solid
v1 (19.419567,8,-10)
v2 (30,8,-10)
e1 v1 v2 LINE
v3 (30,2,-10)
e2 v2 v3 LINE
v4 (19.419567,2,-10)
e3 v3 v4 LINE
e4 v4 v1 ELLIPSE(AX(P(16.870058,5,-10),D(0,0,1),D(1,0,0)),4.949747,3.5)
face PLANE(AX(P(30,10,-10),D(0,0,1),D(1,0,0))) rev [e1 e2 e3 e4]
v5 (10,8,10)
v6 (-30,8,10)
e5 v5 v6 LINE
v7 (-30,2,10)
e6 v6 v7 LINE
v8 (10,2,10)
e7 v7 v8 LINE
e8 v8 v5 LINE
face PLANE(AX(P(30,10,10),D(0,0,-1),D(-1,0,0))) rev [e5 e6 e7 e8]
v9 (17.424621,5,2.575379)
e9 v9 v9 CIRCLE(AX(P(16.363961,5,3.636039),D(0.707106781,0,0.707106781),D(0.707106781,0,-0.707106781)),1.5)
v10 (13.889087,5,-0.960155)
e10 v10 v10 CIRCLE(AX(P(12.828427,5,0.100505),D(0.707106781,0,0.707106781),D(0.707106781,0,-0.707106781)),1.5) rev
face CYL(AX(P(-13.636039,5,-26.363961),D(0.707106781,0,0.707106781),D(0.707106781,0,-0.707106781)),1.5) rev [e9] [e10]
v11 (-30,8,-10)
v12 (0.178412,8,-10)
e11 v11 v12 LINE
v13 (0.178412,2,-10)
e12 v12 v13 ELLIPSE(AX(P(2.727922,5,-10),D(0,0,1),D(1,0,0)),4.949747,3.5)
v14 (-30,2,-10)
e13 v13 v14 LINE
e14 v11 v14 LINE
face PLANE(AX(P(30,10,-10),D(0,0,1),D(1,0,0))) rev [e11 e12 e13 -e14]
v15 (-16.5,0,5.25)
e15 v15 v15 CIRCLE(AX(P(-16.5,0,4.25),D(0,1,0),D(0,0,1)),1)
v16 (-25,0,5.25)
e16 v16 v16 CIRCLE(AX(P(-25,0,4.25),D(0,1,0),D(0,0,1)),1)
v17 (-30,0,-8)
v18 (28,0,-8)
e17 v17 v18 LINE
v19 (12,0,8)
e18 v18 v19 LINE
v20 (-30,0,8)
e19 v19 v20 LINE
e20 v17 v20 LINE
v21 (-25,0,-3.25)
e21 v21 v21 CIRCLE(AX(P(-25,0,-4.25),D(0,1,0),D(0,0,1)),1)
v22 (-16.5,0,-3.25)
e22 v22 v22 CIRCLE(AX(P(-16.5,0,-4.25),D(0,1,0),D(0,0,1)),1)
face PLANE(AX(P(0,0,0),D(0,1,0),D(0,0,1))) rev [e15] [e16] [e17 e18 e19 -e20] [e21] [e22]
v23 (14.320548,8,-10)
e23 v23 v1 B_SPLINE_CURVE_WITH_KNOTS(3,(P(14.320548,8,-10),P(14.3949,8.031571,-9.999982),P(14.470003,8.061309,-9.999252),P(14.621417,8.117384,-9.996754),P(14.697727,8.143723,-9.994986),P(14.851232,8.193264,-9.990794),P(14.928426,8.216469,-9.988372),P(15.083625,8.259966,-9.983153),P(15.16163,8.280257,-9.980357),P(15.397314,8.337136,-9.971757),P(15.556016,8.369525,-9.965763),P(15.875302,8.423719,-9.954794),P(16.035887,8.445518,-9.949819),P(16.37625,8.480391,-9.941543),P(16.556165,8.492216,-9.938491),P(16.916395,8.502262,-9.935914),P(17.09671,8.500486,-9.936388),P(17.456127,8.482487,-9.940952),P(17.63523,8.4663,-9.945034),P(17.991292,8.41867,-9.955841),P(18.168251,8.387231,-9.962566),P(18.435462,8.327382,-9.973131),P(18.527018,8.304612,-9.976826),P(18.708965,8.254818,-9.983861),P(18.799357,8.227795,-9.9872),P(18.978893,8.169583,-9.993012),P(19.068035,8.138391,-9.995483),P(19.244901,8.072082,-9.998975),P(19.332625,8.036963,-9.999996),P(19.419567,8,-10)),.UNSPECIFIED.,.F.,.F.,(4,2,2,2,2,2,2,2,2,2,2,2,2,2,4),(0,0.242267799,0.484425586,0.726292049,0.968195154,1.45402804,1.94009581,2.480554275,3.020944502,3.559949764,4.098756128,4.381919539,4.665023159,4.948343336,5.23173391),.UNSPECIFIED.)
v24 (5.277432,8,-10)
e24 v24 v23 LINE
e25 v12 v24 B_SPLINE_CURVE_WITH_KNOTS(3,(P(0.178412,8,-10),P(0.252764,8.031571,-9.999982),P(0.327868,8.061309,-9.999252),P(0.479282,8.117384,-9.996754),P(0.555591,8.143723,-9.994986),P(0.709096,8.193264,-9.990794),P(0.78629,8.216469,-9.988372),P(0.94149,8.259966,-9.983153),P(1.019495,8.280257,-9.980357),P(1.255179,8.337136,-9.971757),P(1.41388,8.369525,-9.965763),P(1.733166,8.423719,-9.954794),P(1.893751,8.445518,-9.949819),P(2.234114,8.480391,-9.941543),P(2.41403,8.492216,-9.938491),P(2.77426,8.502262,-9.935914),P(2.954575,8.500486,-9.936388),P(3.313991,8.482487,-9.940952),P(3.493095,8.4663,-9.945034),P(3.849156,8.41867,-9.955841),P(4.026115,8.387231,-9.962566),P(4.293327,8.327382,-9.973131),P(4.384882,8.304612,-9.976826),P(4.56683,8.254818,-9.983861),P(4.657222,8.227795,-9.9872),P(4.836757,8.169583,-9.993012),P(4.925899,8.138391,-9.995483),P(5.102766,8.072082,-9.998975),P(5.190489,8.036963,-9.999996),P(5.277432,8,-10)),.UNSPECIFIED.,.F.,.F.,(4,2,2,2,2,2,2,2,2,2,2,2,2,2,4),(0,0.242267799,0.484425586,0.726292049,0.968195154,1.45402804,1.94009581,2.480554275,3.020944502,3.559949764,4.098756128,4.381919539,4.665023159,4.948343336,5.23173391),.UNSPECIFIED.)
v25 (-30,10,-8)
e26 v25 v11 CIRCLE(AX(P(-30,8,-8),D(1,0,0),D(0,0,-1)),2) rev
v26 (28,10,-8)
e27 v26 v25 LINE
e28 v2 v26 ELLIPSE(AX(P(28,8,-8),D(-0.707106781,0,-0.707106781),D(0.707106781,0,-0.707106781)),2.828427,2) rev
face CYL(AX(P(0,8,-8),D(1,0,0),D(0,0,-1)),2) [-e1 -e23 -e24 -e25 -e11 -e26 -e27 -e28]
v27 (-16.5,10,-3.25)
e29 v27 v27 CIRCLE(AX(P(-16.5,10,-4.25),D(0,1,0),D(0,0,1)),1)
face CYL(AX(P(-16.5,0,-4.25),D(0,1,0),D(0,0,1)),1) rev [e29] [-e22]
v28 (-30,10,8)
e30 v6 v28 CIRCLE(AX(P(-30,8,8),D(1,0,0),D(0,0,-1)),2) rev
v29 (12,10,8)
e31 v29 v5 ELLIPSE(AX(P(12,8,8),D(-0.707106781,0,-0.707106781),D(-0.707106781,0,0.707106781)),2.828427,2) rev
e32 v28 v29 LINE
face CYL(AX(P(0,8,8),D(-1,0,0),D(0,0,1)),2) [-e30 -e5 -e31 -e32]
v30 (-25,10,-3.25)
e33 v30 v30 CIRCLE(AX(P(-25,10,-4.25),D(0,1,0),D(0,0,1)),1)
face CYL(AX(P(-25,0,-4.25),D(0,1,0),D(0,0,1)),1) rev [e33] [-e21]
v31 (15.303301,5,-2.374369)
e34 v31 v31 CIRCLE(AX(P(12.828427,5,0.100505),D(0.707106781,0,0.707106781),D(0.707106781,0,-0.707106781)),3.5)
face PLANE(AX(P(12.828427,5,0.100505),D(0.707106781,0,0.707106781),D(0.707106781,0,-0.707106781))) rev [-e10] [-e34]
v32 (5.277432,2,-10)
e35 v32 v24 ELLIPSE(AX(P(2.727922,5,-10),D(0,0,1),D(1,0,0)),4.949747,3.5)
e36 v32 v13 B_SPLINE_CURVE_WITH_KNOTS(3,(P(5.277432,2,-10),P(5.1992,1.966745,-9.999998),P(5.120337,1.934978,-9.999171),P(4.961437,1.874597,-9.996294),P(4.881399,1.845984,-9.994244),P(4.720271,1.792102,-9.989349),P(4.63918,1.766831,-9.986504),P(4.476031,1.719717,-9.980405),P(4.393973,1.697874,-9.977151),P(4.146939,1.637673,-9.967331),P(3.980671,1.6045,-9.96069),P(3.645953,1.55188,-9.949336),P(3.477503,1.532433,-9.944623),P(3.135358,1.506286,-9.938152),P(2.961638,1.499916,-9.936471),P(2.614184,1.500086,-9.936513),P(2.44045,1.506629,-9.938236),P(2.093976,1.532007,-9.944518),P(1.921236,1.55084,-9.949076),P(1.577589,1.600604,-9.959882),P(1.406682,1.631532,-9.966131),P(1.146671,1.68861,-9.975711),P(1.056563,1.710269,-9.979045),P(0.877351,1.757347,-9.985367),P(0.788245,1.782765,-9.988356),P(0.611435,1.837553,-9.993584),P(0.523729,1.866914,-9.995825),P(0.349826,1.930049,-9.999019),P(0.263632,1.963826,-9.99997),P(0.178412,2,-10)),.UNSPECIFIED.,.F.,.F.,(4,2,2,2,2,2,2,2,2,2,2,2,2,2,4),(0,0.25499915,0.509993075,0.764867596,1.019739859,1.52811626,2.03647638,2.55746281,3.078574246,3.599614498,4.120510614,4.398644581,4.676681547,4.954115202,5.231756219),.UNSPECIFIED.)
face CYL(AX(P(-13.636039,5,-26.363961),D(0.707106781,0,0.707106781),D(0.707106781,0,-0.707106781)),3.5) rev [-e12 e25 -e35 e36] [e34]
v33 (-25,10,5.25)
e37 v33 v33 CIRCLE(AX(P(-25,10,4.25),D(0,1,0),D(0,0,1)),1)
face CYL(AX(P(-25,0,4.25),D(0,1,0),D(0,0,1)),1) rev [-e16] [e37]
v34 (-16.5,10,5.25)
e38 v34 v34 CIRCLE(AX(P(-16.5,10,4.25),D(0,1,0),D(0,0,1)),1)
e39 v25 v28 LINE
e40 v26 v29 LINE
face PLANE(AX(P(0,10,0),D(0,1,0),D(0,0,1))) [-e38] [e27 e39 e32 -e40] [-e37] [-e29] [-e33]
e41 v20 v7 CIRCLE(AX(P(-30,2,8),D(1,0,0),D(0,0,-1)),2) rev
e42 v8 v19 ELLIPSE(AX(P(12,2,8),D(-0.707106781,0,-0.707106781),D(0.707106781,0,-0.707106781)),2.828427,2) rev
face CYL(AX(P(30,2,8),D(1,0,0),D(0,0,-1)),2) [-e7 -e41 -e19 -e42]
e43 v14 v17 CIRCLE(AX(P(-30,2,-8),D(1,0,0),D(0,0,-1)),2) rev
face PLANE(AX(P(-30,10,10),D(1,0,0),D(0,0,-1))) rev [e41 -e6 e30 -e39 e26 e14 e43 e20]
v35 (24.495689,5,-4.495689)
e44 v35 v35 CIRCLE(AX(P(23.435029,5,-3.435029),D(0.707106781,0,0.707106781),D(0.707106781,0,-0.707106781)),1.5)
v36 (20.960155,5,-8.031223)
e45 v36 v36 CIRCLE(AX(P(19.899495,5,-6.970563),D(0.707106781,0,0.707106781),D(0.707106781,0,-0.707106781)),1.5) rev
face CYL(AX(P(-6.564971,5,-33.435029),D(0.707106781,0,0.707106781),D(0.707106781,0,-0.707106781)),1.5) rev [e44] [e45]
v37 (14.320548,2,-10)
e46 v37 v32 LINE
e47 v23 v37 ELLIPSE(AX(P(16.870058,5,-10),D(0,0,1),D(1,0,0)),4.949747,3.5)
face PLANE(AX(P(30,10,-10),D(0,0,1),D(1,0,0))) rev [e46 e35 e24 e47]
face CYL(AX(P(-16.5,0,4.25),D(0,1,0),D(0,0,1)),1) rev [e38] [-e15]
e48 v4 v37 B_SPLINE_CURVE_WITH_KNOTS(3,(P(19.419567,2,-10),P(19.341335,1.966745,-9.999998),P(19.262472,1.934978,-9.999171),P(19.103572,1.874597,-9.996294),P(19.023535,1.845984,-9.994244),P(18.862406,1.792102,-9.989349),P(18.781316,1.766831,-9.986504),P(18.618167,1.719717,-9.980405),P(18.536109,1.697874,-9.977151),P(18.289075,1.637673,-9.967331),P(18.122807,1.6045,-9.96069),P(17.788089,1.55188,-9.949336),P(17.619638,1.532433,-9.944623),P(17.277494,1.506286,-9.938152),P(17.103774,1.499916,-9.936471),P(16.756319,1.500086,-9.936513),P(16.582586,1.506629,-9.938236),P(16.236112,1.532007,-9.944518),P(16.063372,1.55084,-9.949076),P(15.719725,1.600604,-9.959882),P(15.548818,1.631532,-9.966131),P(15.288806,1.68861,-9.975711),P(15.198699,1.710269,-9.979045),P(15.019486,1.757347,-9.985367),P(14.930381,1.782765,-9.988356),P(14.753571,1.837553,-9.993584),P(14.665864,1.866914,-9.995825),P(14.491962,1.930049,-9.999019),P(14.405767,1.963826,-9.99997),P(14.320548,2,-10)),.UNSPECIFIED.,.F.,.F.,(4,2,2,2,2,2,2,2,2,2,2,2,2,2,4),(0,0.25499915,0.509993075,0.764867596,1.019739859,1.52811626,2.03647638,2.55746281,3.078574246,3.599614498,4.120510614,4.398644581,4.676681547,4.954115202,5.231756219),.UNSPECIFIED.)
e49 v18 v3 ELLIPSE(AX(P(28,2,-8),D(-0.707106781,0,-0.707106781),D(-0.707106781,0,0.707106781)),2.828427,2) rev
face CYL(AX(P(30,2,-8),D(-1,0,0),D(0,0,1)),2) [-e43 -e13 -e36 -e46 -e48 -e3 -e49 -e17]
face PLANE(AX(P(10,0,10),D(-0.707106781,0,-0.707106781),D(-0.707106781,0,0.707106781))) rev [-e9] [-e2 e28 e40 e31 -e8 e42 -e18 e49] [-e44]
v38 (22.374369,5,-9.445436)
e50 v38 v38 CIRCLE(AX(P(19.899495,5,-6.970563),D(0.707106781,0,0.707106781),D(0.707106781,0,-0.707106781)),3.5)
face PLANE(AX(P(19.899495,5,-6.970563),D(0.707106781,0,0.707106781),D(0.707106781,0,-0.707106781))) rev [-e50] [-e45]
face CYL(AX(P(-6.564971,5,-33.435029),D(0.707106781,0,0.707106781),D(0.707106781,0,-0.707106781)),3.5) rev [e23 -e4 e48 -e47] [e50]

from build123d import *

# Parameters (mm, degrees)
SKETCH1_W           = 60
SKETCH1_H           = 20
BOSS_EXTRUDE1_DEPTH = 10
SKETCH2_R           = 1
CUT_EXTRUDE1_DEPTH  = 10
CUT_EXTRUDE4_DEPTH  = 34.166247904
SKETCH6_R           = 1.5
CUT_EXTRUDE5_DEPTH  = 46.82575695
CUT_EXTRUDE6_START  = -5
SKETCH7_R           = 3.5
CUT_EXTRUDE6_DEPTH  = 41.82575695
FILLET2_R           = 2


with BuildPart() as part:
    # Sketch1 → Boss-Extrude1 (new body)
    with BuildSketch(Plane(origin=(0, 0, 0), x_dir=(1, 0, 0), z_dir=(0, 1, 0))):
        Rectangle(SKETCH1_W, SKETCH1_H)
    extrude(amount=BOSS_EXTRUDE1_DEPTH)

    # Sketch2 → Cut-Extrude1 (cut)
    with BuildSketch(Plane(origin=(0, 10, 0), x_dir=(1, 0, 0), z_dir=(0, 1, 0))):
        with Locations(Location((-25, 4.25, 0), (0, 0, 270))):
            Circle(SKETCH2_R)
        with Locations(Location((-16.5, 4.25, 0), (0, 0, 270))):
            Circle(SKETCH2_R)
        with Locations(Location((-16.5, -4.25, 0), (0, 0, 270))):
            Circle(SKETCH2_R)
        with Locations(Location((-25, -4.25, 0), (0, 0, 270))):
            Circle(SKETCH2_R)
    extrude(amount=-CUT_EXTRUDE1_DEPTH, mode=Mode.SUBTRACT)

    # Sketch5 → Cut-Extrude4 (cut, through all)
    with BuildSketch(Plane(origin=(0, 10, 0), x_dir=(1, 0, 0), z_dir=(0, 1, 0))):
        Polygon((10, -10), (30, 10), (30, -10), align=None)
    extrude(amount=-CUT_EXTRUDE4_DEPTH, mode=Mode.SUBTRACT)

    # Sketch6 → Cut-Extrude5 (cut, through all)
    with BuildSketch(Plane(origin=(10, 0, 10), x_dir=(0.7071067811865487, 0, -0.7071067811865464), z_dir=(0.7071067811865464, 0, 0.7071067811865487))):
        with Locations((19, 5)):
            Circle(SKETCH6_R)
        with Locations((9, 5)):
            Circle(SKETCH6_R)
    extrude(amount=-CUT_EXTRUDE5_DEPTH, mode=Mode.SUBTRACT)

    # Sketch7 → Cut-Extrude6 (cut, through all)
    with BuildSketch(Plane(origin=(10, 0, 10), x_dir=(0.7071067811865487, 0, -0.7071067811865464), z_dir=(0.7071067811865464, 0, 0.7071067811865487)).offset(CUT_EXTRUDE6_START)):
        with Locations((19, 5)):
            Circle(SKETCH7_R)
        with Locations((9, 5)):
            Circle(SKETCH7_R)
    extrude(amount=-CUT_EXTRUDE6_DEPTH, mode=Mode.SUBTRACT)

    # Fillet2
    # the kernel refuses this fillet: 2 mm, written as the material it takes off along each edge
    with BuildSketch(Plane(origin=(15, 10, 10), x_dir=(0, -1, 0), z_dir=(-1, 0, 0))) as fillet2_piece_1:
        with BuildLine():
            CenterArc((FILLET2_R, -FILLET2_R), FILLET2_R, 90, 90)
            Line((0, -FILLET2_R), (0, 0))
            Line((0, 0), (FILLET2_R, 0))
        make_face()
    extrude(amount=50, mode=Mode.SUBTRACT)
    with BuildSketch(Plane(origin=(15, 0, 10), x_dir=(0, 1, 0), z_dir=(-1, 0, 0))) as fillet2_piece_2:
        with BuildLine():
            CenterArc((FILLET2_R, FILLET2_R), FILLET2_R, 180, 90)
            Line((0, FILLET2_R), (0, 0))
            Line((0, 0), (FILLET2_R, 0))
        make_face()
    extrude(amount=50, mode=Mode.SUBTRACT)
    with BuildSketch(Plane(origin=(-35, 0, -10), x_dir=(0, 0, 1), z_dir=(1, 0, 0))) as fillet2_piece_3:
        with BuildLine():
            CenterArc((FILLET2_R, -FILLET2_R), FILLET2_R, 90, 90)
            Line((0, -FILLET2_R), (0, 0))
            Line((0, 0), (FILLET2_R, 0))
        make_face()
    extrude(amount=70, mode=Mode.SUBTRACT)
    with BuildSketch(Plane(origin=(-35, 10, -10), x_dir=(0, 0, 1), z_dir=(1, 0, 0))) as fillet2_piece_4:
        with BuildLine():
            CenterArc((FILLET2_R, FILLET2_R), FILLET2_R, 180, 90)
            Line((0, FILLET2_R), (0, 0))
            Line((0, 0), (FILLET2_R, 0))
        make_face()
    extrude(amount=70, mode=Mode.SUBTRACT)


solid = part.part
